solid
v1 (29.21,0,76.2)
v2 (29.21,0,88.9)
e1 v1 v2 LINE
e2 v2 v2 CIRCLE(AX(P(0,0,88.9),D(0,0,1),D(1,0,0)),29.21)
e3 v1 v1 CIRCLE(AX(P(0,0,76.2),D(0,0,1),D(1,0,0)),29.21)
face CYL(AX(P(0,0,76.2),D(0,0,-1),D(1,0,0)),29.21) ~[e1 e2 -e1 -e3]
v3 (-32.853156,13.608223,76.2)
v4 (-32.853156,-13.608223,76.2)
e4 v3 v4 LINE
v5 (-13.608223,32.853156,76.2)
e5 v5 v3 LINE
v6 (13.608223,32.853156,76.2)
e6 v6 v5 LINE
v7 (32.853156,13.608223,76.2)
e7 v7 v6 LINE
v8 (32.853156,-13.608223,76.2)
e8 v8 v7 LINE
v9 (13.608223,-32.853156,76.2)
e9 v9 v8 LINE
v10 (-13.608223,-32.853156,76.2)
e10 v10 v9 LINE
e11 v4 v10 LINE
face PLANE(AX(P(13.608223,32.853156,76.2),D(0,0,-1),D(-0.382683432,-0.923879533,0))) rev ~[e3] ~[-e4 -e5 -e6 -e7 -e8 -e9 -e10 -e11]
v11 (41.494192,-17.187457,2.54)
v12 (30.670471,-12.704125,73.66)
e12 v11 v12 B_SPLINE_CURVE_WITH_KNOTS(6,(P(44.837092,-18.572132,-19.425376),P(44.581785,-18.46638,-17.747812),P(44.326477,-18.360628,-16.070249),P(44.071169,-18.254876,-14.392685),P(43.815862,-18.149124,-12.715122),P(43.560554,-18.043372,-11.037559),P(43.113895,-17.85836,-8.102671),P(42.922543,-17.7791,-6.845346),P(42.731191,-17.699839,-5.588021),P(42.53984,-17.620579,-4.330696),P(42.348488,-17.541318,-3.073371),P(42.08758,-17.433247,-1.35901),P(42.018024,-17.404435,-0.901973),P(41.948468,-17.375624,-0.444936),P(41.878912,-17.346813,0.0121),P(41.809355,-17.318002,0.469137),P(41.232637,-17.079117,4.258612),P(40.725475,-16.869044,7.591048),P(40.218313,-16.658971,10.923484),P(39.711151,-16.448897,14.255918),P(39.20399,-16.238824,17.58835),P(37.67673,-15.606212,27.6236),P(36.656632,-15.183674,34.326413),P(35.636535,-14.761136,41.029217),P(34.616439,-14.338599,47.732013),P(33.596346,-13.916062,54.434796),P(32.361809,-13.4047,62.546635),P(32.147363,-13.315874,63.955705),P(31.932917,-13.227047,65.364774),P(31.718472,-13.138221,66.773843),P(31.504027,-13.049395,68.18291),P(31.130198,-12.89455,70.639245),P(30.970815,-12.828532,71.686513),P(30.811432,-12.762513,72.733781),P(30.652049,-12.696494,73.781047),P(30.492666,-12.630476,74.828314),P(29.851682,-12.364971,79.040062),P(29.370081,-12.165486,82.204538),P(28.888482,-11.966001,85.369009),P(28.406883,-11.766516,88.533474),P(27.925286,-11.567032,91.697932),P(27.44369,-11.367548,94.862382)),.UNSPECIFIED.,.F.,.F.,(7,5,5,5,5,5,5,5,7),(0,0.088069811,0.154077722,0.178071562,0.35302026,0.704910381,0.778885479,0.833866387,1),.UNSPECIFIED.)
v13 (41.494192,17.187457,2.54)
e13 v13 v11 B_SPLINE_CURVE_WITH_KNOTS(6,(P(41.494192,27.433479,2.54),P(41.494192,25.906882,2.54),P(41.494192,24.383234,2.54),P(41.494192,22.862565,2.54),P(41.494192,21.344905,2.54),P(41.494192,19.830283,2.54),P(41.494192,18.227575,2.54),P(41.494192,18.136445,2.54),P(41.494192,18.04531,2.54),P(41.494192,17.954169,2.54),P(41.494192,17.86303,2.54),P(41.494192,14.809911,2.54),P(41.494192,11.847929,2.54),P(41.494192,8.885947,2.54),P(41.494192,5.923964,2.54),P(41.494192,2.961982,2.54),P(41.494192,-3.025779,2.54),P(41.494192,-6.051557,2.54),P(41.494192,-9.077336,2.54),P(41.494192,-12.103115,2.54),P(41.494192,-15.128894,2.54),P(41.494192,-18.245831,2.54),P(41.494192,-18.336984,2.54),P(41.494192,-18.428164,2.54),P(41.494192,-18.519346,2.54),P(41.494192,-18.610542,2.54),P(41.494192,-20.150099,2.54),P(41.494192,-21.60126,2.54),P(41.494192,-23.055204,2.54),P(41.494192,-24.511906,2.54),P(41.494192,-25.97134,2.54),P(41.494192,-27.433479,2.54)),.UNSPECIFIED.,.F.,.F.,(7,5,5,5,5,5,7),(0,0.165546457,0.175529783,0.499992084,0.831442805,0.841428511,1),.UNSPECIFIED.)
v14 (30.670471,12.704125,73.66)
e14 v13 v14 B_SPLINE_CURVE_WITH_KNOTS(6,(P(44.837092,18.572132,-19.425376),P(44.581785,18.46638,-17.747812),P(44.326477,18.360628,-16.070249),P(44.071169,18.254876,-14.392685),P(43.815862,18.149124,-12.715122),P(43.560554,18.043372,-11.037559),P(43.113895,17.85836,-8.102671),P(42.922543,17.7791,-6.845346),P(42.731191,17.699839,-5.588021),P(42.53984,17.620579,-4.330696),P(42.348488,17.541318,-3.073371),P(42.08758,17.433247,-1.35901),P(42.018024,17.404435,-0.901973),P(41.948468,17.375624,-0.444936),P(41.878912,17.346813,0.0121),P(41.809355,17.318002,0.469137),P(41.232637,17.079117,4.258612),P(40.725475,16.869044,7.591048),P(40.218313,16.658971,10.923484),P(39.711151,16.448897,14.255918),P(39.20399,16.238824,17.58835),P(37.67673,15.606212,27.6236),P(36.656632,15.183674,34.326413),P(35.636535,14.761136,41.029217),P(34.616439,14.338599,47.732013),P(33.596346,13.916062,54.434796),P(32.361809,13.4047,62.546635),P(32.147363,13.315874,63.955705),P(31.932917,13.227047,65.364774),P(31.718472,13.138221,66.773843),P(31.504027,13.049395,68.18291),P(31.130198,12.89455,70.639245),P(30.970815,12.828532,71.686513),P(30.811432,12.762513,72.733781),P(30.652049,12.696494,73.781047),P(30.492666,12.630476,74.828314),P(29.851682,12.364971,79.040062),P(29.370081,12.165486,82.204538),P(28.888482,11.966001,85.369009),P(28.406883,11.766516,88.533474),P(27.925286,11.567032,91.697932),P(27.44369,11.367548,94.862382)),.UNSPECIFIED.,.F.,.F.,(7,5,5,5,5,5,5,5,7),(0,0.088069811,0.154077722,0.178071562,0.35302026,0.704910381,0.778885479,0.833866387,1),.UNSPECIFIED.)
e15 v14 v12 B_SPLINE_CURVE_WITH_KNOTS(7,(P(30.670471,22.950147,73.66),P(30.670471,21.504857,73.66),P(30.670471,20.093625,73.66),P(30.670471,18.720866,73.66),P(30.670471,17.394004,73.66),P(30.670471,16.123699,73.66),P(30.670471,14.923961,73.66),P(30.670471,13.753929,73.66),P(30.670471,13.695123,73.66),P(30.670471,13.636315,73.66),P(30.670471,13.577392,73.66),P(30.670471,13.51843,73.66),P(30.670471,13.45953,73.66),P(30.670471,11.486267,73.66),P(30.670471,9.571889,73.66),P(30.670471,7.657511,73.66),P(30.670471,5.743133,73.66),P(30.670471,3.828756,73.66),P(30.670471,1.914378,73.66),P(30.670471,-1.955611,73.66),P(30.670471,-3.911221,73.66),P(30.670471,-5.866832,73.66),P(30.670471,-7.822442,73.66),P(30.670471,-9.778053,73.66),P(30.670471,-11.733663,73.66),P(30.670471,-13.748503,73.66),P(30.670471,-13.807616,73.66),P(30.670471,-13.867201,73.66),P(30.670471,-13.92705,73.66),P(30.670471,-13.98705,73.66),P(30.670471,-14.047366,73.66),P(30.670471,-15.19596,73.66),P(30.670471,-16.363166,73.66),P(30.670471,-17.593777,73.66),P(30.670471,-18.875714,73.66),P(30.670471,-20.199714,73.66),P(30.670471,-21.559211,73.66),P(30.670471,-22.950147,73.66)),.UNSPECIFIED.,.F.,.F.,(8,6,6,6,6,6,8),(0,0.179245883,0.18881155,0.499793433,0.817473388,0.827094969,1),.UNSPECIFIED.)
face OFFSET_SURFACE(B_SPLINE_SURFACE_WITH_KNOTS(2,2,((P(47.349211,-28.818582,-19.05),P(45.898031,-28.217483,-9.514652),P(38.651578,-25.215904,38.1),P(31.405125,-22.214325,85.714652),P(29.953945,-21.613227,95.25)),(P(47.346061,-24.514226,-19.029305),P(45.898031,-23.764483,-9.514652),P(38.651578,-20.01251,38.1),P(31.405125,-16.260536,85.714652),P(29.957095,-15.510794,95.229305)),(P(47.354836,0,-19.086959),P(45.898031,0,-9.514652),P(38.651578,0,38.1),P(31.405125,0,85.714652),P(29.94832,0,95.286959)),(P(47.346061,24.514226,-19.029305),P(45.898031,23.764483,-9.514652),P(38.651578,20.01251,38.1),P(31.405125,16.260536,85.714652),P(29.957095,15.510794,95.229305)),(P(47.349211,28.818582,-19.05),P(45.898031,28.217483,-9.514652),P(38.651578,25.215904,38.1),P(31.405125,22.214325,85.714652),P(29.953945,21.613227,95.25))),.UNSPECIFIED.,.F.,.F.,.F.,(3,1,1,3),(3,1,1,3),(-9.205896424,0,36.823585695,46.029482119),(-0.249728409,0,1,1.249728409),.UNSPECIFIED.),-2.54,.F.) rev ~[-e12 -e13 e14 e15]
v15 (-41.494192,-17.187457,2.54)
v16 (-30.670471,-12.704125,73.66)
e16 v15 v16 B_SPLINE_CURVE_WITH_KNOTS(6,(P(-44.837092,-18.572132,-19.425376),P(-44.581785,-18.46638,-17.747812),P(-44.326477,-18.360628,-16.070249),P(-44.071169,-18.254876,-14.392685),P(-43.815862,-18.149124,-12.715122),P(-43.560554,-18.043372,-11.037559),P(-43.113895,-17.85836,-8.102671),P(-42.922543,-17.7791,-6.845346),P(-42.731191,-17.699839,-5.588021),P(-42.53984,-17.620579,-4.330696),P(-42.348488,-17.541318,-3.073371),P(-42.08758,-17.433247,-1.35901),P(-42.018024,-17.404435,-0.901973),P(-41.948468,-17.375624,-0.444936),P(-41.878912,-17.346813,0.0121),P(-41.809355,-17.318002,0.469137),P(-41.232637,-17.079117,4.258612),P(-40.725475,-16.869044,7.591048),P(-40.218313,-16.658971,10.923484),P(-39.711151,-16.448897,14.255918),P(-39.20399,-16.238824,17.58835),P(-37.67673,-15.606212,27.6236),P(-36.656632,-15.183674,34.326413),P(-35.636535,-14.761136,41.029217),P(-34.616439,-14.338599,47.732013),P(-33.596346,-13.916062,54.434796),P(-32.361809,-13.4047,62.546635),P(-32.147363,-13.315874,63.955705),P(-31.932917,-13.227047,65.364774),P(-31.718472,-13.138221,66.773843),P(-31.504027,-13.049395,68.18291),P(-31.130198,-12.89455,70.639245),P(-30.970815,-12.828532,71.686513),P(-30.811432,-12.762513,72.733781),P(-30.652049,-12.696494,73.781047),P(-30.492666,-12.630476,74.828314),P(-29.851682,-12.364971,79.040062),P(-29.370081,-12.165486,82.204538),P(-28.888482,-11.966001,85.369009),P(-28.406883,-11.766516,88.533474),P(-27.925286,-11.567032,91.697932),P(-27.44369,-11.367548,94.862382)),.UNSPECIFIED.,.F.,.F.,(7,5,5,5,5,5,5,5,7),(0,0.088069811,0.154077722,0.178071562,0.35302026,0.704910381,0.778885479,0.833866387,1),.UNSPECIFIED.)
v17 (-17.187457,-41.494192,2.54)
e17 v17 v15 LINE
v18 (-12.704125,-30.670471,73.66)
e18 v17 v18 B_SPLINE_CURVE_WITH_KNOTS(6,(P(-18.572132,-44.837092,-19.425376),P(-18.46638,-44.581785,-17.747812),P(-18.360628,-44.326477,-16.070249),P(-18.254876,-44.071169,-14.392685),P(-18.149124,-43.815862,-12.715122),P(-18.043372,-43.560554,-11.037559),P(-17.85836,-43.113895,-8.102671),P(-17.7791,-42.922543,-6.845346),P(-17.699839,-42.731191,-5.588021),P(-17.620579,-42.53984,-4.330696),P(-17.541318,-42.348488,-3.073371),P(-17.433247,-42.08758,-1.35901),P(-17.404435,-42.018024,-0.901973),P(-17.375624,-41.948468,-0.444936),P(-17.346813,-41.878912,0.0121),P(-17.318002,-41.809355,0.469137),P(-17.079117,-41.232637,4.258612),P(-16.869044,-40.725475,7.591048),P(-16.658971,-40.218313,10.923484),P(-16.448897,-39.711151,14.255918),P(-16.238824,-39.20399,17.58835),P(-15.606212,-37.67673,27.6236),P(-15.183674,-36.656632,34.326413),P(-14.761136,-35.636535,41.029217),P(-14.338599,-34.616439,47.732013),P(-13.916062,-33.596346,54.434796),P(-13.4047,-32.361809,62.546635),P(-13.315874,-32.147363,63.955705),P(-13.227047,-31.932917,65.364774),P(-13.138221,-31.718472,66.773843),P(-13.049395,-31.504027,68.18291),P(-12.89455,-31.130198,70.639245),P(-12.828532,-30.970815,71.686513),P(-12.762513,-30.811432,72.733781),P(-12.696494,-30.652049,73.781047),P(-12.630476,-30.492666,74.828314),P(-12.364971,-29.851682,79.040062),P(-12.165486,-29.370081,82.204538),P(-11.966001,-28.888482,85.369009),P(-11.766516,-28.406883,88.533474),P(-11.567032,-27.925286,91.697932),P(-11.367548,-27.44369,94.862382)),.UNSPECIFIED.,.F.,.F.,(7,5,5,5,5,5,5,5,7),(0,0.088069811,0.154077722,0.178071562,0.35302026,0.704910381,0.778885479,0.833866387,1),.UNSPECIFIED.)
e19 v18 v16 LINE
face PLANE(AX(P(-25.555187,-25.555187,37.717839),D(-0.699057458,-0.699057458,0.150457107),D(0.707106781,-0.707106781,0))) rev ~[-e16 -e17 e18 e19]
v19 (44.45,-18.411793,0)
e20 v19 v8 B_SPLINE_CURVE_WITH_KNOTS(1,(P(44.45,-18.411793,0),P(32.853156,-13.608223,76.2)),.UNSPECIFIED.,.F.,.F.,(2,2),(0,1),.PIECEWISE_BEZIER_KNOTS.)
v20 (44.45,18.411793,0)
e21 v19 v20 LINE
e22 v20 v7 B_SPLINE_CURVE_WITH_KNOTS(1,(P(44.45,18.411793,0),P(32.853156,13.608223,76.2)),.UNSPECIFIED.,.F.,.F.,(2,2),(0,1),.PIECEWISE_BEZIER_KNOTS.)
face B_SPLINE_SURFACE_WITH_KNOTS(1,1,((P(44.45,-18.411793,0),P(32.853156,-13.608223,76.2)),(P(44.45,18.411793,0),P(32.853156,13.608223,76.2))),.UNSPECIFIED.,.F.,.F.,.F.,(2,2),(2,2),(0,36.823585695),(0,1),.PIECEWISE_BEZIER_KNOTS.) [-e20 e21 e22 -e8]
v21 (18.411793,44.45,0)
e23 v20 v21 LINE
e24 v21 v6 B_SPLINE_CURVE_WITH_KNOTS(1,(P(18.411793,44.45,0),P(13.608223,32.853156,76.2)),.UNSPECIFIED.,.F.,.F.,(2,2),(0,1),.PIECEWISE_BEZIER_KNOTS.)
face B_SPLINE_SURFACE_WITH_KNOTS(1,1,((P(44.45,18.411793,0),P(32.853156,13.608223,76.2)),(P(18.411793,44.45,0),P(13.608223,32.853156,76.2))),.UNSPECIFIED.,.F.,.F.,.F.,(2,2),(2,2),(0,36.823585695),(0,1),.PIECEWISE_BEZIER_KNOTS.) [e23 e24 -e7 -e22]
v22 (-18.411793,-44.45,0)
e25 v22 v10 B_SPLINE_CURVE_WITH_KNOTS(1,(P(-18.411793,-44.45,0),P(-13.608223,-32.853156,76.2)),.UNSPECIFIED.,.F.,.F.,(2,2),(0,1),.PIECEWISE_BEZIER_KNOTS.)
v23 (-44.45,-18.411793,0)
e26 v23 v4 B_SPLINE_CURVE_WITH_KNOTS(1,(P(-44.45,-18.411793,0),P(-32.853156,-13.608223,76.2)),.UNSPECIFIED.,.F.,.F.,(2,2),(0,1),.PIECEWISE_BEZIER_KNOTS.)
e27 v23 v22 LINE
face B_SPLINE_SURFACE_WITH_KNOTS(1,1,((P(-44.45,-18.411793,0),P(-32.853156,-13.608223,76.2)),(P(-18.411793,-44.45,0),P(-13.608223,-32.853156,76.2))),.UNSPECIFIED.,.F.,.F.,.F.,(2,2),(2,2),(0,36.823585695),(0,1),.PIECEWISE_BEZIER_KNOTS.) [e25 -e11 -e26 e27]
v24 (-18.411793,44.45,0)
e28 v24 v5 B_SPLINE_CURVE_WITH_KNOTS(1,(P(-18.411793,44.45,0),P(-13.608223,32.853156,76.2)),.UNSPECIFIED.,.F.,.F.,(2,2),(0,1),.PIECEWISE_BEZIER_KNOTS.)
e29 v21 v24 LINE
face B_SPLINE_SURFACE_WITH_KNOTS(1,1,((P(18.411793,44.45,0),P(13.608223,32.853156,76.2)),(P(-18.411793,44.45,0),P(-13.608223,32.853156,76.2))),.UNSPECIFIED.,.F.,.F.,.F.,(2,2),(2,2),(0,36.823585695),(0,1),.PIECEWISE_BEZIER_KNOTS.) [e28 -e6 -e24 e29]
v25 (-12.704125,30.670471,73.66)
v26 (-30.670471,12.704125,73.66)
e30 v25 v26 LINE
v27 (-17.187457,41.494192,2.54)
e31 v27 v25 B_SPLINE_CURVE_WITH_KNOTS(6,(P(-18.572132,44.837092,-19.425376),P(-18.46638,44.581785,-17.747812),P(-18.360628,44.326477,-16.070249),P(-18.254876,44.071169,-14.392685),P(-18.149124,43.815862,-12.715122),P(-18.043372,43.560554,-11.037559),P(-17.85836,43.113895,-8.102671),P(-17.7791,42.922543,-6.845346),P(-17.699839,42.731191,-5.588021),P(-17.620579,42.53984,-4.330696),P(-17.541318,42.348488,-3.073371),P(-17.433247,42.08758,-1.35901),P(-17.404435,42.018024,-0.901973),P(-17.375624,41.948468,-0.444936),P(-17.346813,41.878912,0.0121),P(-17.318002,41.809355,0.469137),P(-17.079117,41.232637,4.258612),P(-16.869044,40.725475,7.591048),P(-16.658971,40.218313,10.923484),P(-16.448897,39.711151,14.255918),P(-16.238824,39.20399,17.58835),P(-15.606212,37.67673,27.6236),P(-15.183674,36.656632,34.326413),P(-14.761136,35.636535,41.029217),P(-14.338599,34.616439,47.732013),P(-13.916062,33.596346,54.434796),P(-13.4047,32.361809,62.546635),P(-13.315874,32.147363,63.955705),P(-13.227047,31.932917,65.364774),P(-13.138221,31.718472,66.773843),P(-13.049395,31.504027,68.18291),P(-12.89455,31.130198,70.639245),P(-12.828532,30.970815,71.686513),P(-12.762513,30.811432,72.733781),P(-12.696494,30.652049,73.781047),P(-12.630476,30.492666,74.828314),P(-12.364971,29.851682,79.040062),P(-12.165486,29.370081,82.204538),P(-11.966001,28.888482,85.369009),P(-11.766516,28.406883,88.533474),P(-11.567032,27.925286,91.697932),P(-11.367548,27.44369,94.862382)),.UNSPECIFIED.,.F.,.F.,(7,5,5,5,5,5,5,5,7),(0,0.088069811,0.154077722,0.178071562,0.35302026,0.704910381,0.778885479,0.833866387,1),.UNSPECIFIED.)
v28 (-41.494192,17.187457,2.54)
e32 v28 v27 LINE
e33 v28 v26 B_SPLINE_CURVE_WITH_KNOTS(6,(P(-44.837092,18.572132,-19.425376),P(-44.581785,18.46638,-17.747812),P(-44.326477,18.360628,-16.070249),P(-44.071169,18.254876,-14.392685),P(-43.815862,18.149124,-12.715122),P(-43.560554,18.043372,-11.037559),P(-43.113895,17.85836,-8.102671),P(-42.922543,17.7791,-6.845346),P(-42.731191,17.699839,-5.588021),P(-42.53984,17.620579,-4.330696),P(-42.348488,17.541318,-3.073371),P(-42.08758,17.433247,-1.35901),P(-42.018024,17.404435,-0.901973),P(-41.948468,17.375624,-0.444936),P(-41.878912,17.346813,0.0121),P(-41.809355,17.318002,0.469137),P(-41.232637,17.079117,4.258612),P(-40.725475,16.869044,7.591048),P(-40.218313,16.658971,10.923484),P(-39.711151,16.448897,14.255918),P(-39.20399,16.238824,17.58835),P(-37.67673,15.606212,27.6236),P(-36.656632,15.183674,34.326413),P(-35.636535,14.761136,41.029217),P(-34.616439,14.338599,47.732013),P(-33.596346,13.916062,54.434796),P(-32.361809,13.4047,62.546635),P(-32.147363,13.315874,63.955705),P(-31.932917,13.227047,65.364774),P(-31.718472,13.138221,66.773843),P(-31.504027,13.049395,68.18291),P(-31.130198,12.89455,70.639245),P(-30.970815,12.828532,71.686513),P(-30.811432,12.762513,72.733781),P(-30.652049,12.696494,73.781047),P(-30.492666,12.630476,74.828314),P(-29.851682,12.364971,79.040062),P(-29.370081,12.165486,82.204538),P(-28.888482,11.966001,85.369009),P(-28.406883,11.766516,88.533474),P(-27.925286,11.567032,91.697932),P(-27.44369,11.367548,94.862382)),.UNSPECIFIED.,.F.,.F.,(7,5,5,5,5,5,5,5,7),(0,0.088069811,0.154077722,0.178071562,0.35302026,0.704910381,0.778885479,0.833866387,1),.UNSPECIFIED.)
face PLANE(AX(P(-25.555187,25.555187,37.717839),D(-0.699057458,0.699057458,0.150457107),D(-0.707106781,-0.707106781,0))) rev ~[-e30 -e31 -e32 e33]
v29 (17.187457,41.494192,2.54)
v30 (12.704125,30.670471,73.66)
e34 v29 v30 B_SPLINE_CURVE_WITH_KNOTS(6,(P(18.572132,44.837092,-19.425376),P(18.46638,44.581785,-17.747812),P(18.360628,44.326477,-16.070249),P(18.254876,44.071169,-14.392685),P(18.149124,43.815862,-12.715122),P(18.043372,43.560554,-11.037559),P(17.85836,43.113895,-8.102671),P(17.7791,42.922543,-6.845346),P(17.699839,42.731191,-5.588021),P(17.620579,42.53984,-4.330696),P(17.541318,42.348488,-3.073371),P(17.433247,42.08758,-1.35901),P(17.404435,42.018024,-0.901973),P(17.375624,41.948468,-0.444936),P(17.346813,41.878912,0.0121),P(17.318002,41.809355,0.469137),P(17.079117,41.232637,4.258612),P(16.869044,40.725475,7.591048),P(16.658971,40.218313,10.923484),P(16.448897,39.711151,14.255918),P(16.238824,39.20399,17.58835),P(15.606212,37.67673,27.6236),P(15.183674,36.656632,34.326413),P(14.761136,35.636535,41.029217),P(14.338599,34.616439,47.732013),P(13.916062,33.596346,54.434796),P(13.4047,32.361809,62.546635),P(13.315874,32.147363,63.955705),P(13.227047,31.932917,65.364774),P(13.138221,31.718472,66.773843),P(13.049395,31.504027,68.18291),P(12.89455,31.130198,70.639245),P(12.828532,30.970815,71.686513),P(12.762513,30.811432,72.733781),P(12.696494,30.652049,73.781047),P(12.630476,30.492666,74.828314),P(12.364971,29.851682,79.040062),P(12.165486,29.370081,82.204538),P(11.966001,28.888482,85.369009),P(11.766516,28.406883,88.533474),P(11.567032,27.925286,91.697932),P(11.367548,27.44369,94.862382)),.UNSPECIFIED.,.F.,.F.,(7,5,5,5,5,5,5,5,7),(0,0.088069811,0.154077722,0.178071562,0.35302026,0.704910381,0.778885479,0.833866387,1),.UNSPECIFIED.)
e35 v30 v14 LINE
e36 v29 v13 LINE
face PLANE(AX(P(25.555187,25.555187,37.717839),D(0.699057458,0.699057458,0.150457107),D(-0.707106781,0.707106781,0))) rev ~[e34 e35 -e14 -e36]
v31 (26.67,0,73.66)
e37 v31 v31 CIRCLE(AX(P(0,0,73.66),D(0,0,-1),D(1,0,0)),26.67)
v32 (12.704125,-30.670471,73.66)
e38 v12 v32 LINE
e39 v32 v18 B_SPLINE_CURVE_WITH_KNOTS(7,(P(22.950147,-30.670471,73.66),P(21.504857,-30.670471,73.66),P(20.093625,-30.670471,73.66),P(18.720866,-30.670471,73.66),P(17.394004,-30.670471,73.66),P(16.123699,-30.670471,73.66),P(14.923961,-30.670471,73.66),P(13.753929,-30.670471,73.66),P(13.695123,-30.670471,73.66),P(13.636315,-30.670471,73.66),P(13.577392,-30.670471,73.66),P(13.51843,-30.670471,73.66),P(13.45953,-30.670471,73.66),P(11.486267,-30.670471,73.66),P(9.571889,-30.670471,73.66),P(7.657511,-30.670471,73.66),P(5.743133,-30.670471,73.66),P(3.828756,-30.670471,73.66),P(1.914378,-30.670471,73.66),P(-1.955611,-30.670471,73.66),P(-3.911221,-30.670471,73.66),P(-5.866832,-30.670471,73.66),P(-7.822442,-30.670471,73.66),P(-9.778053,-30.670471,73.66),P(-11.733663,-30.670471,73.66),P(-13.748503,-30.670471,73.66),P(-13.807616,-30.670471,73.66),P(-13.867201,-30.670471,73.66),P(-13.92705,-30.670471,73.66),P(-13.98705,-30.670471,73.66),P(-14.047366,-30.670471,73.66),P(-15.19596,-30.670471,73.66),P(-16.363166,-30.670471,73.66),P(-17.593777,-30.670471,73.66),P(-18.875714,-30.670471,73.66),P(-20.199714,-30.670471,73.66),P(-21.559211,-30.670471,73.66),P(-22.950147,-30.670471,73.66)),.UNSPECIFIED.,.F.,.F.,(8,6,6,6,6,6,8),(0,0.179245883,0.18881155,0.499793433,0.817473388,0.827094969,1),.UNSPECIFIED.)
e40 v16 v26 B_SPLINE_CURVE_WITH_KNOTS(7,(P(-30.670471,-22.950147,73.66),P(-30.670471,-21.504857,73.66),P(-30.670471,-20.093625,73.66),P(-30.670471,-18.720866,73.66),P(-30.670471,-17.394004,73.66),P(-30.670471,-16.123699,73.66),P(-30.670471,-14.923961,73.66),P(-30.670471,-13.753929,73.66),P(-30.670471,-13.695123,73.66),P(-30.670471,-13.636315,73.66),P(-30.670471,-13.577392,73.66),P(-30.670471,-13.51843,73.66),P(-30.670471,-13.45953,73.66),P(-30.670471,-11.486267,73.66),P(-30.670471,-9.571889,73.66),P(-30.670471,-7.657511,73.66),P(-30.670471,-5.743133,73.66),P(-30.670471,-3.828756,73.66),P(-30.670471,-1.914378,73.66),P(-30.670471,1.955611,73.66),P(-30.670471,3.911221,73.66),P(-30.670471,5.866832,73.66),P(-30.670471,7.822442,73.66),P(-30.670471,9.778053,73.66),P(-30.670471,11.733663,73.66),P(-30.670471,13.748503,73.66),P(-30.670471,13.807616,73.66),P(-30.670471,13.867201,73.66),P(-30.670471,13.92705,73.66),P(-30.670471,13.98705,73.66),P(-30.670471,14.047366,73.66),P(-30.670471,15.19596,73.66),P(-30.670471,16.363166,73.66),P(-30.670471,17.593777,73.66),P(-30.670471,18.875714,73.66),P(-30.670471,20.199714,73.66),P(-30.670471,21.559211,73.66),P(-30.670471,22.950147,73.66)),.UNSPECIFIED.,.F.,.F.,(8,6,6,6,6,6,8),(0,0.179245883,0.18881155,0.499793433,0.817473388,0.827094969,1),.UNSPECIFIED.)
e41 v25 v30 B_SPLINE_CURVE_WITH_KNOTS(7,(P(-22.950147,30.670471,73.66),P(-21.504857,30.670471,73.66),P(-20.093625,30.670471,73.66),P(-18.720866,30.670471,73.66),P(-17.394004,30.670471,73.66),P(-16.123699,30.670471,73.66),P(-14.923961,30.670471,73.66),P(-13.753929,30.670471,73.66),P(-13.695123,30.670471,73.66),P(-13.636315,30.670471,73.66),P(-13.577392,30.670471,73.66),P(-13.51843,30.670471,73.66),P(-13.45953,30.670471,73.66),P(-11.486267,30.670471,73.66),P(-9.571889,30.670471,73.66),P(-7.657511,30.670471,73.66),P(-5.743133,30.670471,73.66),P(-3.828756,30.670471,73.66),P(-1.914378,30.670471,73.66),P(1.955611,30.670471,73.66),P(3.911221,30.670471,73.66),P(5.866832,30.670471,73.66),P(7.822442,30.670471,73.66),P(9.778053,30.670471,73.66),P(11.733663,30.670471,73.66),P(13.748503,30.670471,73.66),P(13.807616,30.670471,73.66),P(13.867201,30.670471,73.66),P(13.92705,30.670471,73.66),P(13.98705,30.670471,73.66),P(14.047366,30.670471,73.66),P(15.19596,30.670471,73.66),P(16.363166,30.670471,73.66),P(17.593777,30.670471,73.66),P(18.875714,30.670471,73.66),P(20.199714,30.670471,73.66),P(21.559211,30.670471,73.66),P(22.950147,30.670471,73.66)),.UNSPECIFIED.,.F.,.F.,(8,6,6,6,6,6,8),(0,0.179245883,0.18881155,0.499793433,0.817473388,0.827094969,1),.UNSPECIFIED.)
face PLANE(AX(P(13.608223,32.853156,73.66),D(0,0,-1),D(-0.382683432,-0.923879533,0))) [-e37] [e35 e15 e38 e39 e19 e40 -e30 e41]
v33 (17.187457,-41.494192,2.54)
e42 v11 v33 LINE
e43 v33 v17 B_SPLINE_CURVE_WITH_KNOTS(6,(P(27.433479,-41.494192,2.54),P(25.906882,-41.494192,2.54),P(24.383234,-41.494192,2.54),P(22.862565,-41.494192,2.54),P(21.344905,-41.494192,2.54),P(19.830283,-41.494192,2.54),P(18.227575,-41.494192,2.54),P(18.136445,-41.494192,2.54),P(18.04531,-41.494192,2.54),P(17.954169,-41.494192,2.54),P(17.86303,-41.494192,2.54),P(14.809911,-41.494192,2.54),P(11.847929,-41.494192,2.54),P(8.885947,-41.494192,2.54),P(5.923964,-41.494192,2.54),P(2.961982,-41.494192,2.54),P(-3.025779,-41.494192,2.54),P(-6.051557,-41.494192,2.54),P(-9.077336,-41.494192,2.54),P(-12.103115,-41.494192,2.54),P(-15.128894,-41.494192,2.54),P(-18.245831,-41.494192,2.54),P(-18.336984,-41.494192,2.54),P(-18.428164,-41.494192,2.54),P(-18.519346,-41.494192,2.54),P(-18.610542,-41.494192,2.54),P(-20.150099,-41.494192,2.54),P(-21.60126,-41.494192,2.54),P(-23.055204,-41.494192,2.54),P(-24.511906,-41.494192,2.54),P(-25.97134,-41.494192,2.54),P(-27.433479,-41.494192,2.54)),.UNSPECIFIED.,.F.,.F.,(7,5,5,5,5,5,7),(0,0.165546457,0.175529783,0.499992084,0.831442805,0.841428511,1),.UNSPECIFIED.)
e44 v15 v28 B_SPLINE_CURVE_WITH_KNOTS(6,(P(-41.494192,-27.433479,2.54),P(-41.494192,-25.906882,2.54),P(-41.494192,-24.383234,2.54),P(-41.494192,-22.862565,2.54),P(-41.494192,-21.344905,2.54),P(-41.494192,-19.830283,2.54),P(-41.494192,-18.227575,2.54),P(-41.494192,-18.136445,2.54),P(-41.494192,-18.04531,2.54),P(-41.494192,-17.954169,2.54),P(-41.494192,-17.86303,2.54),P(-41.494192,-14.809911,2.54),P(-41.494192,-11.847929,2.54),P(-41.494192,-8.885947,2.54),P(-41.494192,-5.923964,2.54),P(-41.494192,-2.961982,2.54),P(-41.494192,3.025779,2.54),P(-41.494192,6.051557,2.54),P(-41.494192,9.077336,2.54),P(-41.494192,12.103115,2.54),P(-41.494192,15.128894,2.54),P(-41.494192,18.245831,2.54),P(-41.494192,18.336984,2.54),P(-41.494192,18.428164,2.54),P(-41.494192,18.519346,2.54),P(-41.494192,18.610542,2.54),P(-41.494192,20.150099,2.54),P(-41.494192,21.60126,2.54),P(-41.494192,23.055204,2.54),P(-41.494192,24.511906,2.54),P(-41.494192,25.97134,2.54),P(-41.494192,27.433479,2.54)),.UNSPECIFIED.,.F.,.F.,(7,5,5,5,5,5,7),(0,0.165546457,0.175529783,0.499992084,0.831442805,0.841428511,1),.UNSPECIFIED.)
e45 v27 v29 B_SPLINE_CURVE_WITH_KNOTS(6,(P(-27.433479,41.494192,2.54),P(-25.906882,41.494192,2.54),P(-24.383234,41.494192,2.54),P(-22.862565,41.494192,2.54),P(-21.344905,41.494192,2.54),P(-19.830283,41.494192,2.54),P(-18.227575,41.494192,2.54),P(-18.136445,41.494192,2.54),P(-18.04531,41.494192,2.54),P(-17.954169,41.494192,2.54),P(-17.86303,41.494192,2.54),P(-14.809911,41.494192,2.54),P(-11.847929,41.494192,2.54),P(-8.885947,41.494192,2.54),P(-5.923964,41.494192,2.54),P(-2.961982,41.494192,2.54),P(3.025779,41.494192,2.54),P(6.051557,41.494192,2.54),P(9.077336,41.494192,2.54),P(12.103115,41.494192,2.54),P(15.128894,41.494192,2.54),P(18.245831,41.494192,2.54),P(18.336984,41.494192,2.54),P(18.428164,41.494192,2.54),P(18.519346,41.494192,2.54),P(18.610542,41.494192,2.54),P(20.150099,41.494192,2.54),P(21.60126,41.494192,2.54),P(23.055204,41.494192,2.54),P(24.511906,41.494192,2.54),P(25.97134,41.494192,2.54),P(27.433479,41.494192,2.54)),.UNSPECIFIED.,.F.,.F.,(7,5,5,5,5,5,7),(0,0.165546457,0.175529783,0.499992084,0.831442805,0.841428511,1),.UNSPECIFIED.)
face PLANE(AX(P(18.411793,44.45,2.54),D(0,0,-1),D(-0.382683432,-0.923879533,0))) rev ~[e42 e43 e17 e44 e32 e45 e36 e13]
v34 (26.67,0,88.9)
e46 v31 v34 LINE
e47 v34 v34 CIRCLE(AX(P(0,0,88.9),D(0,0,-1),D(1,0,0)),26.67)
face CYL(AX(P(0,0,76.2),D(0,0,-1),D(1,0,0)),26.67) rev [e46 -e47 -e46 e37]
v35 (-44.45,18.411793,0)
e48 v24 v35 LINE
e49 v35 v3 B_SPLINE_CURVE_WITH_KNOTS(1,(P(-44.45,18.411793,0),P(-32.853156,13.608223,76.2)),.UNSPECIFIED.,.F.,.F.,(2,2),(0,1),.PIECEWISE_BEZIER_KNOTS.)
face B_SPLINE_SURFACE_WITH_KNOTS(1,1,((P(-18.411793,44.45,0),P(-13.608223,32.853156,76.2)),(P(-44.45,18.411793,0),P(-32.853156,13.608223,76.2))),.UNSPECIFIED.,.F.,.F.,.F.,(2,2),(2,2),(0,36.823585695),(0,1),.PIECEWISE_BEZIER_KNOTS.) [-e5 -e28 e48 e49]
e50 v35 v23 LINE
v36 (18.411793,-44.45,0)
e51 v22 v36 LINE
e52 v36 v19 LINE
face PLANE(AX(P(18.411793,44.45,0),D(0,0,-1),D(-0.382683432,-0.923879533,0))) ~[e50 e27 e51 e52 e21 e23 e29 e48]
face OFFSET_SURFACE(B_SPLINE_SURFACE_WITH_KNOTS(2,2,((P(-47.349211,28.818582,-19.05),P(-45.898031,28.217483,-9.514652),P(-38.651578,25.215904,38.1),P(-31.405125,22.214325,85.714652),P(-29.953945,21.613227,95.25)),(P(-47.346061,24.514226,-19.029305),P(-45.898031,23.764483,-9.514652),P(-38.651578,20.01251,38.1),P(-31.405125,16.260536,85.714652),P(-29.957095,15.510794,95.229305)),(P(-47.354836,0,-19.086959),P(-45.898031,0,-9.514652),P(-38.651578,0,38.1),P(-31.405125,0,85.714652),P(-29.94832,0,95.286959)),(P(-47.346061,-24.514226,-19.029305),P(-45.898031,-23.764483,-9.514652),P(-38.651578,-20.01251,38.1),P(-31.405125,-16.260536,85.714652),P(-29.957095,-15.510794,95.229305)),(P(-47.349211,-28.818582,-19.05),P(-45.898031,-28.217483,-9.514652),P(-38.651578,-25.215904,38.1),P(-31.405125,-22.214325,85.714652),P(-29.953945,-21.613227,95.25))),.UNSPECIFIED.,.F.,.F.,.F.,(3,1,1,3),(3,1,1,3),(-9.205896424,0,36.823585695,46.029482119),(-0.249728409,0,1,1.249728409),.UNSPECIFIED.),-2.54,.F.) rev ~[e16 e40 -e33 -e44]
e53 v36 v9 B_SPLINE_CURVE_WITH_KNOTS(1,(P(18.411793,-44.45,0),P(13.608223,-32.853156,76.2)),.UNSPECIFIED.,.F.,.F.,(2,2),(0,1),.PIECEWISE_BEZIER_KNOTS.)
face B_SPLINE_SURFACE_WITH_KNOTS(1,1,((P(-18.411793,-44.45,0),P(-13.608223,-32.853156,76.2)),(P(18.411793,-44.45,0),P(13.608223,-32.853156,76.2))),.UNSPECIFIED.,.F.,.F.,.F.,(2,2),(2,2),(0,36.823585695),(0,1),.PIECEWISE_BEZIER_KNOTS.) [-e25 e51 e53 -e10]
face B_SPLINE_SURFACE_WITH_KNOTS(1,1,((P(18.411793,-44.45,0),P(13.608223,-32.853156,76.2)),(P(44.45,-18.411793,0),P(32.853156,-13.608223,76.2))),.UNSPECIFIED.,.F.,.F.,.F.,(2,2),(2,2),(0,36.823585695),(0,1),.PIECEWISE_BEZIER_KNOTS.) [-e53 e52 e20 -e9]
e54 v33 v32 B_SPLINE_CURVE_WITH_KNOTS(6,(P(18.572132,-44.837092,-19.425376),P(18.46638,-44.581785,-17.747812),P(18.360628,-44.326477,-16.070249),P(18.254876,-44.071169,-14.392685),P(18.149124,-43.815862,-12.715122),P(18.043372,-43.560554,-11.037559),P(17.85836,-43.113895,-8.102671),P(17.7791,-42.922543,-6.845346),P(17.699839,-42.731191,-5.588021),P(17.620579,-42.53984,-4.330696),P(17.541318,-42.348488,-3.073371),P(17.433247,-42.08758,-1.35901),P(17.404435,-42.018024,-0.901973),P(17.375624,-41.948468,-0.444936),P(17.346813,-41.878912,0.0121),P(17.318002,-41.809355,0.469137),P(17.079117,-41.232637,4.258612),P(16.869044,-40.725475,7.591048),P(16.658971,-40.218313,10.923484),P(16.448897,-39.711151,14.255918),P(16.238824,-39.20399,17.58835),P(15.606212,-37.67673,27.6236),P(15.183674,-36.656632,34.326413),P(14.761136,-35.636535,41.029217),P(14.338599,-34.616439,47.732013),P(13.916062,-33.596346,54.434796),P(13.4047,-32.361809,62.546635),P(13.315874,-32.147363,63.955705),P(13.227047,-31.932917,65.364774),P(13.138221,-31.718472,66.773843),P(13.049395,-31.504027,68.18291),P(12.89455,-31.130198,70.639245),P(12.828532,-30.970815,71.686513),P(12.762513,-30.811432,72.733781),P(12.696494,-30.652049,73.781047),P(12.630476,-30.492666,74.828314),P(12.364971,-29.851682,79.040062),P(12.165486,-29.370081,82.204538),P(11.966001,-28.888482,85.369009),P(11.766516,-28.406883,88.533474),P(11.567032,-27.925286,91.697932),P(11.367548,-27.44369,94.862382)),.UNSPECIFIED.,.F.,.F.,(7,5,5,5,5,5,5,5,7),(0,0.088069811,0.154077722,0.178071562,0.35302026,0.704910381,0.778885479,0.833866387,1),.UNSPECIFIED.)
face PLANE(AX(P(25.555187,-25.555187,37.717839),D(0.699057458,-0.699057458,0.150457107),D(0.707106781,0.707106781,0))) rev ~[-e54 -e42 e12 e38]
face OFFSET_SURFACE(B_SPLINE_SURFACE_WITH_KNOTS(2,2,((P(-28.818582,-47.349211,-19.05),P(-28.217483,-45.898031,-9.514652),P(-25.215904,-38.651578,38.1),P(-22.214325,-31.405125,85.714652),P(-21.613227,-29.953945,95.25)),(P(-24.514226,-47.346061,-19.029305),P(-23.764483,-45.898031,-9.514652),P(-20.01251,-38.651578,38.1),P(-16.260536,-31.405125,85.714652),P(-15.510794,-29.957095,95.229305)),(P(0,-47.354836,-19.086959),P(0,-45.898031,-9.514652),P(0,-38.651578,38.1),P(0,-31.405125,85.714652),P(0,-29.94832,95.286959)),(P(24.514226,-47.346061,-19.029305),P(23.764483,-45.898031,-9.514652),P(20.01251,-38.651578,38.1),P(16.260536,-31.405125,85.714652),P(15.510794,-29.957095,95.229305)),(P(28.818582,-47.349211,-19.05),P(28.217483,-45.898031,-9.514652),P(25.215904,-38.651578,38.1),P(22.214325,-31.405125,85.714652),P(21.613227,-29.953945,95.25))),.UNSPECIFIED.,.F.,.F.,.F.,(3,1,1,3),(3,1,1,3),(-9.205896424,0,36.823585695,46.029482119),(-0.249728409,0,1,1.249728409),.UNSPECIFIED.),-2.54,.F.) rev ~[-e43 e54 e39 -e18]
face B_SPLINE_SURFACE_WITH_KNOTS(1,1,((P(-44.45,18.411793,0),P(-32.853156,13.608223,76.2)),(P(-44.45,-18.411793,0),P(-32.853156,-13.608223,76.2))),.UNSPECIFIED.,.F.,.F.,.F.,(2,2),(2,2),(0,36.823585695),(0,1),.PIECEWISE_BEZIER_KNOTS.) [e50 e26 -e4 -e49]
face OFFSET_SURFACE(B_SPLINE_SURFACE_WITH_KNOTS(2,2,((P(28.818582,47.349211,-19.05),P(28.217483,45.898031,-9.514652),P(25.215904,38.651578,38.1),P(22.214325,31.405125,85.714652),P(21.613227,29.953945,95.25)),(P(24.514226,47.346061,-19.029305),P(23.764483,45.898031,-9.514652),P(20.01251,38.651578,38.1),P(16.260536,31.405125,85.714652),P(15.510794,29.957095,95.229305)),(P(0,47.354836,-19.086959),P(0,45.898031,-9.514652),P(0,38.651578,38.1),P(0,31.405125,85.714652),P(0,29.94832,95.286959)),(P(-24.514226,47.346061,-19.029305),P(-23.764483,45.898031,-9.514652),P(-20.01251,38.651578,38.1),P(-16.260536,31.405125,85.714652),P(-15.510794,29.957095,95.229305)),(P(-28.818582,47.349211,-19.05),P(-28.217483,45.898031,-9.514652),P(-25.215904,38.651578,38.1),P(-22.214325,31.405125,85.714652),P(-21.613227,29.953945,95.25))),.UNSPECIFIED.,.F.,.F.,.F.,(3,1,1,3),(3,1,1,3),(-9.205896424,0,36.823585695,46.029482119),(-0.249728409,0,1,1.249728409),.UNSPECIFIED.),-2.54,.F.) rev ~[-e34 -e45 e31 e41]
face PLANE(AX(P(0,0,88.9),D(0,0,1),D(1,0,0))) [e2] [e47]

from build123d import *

# Parameters (mm, degrees)
F4_R     = 29.21
F5_DEPTH = 12.7
F6_T     = -2.54


with BuildPart() as f3:
    # F0 (on Top) → F3 section 0
    with BuildSketch(Plane.XY):
        Polygon((18.4117928475, 44.45), (-18.4117928475, 44.45), (-44.45, 18.4117928475), (-44.45, -18.4117928475), (-18.4117928475, -44.45), (18.4117928475, -44.45), (44.45, -18.4117928475), (44.45, 18.4117928475), align=None)
    # F2 (on offset) → F3 section 1
    with BuildSketch(Plane.XY.offset(76.2)):
        Polygon((32.8531561761, -13.6082228549), (32.8531561761, 13.6082228549), (13.6082228549, 32.8531561761), (-13.6082228549, 32.8531561761), (-32.8531561761, 13.6082228549), (-32.8531561761, -13.6082228549), (-13.6082228549, -32.8531561761), (13.6082228549, -32.8531561761), align=None)
    loft()

    # F4 (on face) → F5 (join)
    with BuildSketch(Plane.XY.offset(76.2)):
        Circle(F4_R)
    extrude(amount=F5_DEPTH)

    # F6
    f6_openings = [f3.faces().sort_by_distance(p)[0] for p in [
        (0, 0, 88.9),
    ]]
    offset(amount=F6_T, openings=f6_openings, kind=Kind.INTERSECTION)


solid = f3.part
